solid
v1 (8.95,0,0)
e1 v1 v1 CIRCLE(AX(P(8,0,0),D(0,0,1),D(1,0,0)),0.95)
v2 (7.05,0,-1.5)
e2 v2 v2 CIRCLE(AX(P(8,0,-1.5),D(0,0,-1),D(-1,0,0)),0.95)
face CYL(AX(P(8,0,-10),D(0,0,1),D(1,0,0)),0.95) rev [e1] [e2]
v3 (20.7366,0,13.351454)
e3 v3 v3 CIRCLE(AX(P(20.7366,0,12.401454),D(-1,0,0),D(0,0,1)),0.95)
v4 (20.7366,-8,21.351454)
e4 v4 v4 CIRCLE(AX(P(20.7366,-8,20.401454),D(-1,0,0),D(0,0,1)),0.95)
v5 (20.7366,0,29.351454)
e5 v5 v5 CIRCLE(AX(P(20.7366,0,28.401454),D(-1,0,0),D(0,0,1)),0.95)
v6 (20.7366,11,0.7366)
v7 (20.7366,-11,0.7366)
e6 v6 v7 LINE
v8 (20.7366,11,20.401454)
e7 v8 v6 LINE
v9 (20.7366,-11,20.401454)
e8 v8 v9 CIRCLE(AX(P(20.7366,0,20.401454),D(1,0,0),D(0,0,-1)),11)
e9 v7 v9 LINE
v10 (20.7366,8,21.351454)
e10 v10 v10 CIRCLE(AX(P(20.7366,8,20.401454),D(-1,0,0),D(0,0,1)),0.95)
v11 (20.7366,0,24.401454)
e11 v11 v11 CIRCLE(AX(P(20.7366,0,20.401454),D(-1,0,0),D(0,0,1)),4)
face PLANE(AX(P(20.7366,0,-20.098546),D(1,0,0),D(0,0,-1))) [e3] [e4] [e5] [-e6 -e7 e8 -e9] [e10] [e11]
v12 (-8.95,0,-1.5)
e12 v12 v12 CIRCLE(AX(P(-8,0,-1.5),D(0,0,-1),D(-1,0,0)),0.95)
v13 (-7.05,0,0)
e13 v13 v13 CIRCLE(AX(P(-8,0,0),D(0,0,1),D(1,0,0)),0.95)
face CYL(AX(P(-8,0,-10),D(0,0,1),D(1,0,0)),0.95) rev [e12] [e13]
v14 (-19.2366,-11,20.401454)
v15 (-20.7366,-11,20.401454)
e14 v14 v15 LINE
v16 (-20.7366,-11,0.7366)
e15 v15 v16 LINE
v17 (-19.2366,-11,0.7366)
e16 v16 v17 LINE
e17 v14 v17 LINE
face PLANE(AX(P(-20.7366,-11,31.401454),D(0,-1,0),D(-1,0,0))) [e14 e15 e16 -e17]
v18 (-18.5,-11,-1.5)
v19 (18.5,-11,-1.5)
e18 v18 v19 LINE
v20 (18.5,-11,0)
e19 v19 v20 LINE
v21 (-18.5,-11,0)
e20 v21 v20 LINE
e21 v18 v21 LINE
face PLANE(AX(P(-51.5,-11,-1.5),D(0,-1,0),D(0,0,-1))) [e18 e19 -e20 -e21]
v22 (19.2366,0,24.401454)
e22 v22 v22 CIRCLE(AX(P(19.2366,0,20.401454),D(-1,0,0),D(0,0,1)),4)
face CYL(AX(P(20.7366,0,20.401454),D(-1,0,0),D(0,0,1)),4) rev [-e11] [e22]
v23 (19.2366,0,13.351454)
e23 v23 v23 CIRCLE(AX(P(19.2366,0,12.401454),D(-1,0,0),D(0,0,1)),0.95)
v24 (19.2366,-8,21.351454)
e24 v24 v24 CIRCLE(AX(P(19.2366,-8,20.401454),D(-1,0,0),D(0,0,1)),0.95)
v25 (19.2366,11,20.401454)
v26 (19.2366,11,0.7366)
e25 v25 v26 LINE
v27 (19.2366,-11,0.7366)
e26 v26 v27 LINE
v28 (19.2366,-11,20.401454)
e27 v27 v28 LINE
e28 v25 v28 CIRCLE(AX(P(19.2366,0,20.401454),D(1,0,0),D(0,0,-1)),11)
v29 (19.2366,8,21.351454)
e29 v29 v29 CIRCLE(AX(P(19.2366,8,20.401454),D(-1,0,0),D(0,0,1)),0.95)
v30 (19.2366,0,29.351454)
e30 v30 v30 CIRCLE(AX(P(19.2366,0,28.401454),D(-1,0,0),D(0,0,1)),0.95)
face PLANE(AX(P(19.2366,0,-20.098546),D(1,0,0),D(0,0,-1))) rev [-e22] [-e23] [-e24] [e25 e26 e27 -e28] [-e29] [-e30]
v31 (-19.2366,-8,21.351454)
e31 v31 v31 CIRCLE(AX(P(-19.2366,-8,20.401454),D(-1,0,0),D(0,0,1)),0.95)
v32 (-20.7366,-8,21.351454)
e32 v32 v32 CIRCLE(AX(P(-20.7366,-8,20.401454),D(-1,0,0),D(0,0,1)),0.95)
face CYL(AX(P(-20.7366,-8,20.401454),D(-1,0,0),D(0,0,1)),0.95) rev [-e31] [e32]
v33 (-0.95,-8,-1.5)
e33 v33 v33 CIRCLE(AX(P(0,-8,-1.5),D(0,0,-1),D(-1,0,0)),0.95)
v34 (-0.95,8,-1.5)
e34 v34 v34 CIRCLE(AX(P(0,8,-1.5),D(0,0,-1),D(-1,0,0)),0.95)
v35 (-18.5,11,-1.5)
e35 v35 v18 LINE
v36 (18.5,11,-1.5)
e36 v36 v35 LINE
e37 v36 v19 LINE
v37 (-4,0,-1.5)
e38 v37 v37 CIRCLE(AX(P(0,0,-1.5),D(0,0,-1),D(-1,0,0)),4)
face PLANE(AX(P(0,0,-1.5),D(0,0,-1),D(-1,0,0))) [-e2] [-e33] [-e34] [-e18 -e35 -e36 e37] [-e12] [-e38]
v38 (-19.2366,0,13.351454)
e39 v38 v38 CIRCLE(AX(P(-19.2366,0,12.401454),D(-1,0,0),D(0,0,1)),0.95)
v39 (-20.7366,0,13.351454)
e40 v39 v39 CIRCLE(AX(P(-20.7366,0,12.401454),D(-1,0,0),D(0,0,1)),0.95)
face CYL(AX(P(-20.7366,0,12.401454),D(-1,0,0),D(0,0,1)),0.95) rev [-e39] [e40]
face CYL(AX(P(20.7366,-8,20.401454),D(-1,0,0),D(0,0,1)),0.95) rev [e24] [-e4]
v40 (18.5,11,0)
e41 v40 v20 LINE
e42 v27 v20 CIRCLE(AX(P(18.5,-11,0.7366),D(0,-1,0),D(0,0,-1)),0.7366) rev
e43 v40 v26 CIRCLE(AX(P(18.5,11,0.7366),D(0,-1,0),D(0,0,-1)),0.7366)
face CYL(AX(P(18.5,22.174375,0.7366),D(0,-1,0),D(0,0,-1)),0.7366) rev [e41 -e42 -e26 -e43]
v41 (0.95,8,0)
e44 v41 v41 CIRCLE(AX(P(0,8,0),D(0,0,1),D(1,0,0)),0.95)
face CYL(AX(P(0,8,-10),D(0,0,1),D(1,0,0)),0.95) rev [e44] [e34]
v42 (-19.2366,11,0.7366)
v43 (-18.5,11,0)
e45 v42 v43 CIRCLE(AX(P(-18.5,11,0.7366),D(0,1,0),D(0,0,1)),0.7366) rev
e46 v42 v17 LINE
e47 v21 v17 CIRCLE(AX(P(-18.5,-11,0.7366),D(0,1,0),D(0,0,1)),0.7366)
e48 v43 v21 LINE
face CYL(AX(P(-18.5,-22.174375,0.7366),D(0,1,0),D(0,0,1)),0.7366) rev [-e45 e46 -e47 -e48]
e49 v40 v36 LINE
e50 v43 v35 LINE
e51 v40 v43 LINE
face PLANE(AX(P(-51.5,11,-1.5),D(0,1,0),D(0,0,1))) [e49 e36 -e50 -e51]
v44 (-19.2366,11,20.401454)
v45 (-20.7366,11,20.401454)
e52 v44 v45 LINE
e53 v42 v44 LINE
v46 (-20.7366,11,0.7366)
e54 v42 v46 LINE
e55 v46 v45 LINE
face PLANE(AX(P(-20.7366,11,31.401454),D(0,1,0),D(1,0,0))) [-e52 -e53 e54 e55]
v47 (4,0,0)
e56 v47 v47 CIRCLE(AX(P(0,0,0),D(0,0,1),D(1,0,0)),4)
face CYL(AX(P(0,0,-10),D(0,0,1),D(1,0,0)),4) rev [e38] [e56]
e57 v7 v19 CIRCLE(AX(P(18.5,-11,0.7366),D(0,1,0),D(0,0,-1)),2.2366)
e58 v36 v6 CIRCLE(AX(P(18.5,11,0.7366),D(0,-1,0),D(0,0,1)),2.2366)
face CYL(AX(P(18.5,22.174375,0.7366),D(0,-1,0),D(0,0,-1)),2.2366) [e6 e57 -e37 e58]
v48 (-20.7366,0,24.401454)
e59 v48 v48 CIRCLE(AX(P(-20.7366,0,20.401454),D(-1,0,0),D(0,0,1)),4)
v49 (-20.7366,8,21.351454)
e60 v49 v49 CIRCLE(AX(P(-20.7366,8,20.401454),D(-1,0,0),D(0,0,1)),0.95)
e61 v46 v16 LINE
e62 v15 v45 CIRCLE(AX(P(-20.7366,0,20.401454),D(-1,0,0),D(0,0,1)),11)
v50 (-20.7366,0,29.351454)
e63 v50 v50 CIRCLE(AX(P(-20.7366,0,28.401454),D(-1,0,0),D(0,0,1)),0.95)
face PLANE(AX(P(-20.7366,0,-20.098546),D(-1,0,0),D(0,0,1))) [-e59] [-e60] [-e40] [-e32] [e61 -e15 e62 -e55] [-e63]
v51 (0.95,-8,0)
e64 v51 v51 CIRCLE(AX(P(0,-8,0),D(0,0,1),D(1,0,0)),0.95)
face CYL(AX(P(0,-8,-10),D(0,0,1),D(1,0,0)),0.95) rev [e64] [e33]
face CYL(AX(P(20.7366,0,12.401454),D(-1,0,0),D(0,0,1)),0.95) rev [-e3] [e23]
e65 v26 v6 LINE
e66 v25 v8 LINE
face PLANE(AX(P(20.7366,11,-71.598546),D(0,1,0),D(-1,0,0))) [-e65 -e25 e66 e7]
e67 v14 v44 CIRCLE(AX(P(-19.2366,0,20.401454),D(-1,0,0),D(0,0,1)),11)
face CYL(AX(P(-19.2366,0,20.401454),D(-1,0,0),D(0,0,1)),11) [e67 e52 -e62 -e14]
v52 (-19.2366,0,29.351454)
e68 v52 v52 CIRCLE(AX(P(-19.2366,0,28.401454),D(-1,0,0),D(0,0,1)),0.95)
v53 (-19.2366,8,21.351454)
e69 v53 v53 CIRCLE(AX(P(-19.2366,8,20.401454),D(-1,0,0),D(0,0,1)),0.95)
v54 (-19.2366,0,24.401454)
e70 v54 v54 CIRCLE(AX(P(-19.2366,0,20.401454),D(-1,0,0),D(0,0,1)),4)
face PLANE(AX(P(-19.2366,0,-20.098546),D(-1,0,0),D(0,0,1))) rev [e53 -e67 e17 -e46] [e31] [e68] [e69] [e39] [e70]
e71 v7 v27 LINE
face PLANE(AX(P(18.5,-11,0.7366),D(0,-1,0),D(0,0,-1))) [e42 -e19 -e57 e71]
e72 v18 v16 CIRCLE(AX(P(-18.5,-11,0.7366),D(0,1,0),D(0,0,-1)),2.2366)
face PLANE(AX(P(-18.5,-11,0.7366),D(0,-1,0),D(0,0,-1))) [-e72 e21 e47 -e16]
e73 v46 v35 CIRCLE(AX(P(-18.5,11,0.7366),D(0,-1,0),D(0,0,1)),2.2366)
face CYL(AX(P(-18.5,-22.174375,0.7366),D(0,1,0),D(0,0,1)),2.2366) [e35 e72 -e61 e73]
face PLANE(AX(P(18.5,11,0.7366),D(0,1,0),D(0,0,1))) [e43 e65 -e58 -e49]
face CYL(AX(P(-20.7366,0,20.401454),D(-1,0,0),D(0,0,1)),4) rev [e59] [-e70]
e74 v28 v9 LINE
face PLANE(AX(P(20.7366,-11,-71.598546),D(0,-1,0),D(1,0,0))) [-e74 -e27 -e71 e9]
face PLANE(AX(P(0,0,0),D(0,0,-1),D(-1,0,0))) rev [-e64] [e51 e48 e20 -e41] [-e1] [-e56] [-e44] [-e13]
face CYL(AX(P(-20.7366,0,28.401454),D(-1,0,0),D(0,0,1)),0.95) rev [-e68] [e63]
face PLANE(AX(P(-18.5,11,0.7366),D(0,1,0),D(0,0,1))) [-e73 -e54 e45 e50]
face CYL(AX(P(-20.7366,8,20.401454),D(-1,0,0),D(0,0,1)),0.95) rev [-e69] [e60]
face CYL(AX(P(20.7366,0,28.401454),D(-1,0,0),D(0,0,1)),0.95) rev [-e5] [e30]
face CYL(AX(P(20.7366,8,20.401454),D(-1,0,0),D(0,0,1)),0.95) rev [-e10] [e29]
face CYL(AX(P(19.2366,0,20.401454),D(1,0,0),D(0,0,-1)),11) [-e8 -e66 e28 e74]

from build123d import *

# Parameters (mm, degrees)
SKETCH_1_W             = 103
SKETCH_1_H             = 22
SM_BASE_FLANGE_1_DEPTH = 1.5
OTHER_START            = -11
OTHER_1_DEPTH          = 22
OTHER_1_2_DEPTH        = 22
SKETCH_7_R             = 0.95
SKETCH_7_R_2           = 4
CUT_EXTRUDE_1_DEPTH    = 54.170270292
SKETCH_8_R             = 4
SKETCH_8_R_2           = 0.95
CUT_EXTRUDE_2_DEPTH    = 10


# Read off the part's stored shape, not the designer's step: 绘制的折弯1
# Sheet-metal steps are written as plain solids
with BuildPart() as part:
    # Sketch 1 → 基体-法兰1 (new body)
    with BuildSketch(Plane.XY):
        Rectangle(SKETCH_1_W, SKETCH_1_H)
    extrude(amount=-SM_BASE_FLANGE_1_DEPTH)

    # Other 1 outline → Other 1 (cut)
    with BuildSketch(Plane(origin=(0, 0, 0), x_dir=(1, 0, 0), z_dir=(0, 1, 0)).offset(OTHER_START)):
        with BuildLine():
            ThreePointArc((-20.611823856, 0), (-19.795164082, 1.086838938), (-18.5, 1.5))
            Line((-18.5, 1.5), (-51.5, 1.5))
            Line((-51.5, 1.5), (-51.5, 0))
            Line((-51.5, 0), (-20.611823856, 0))
        make_face()
        with BuildLine():
            Line((51.5, 1.5), (18.5, 1.5))
            ThreePointArc((18.5, 1.5), (19.795164082, 1.086838938), (20.611823856, 0))
            Line((20.611823856, 0), (51.5, 0))
            Line((51.5, 0), (51.5, 1.5))
        make_face()
    extrude(amount=OTHER_1_DEPTH, mode=Mode.SUBTRACT)

    # Other 1 2 outline → Other 1 2 (add)
    with BuildSketch(Plane(origin=(0, 0, 0), x_dir=(1, 0, 0), z_dir=(0, 1, 0)).offset(OTHER_START)):
        with BuildLine():
            Line((-18.5, 0), (-20.611823856, 0))
            ThreePointArc((-20.611823856, 0), (-20.705185343, -0.363053267), (-20.7366, -0.7366))
            Line((-20.7366, -0.7366), (-20.7366, -31.401454181))
            Line((-20.7366, -31.401454181), (-19.2366, -31.401454181))
            Line((-19.2366, -31.401454181), (-19.2366, -0.7366))
            ThreePointArc((-19.2366, -0.7366), (-19.020854855, -0.215745145), (-18.5, 0))
        make_face()
        with BuildLine():
            ThreePointArc((20.7366, -0.7366), (20.705185343, -0.363053267), (20.611823856, 0))
            Line((20.611823856, 0), (18.5, 0))
            ThreePointArc((18.5, 0), (19.020854855, -0.215745145), (19.2366, -0.7366))
            Line((19.2366, -0.7366), (19.2366, -31.401454181))
            Line((19.2366, -31.401454181), (20.7366, -31.401454181))
            Line((20.7366, -31.401454181), (20.7366, -0.7366))
        make_face()
    extrude(amount=OTHER_1_2_DEPTH)

    # 草图7 → 切除-拉伸1 (cut, through all)
    with BuildSketch(Plane.ZY.offset(20.7366)):
        with Locations((20.401454181, 8)):
            Circle(SKETCH_7_R)
        with Locations((12.401454181, 0)):
            Circle(SKETCH_7_R)
        with Locations((20.401454181, 0)):
            Circle(SKETCH_7_R_2)
        with Locations((28.401454181, 0)):
            Circle(SKETCH_7_R)
        with Locations((20.401454181, -8)):
            Circle(SKETCH_7_R)
        with BuildLine():
            ThreePointArc((20.401454181, 11), (28.179628774, 7.778174593), (31.401454181, 0))
            Line((31.401454181, 0), (31.401454181, 11))
            Line((31.401454181, 11), (20.401454181, 11))
        make_face()
        with BuildLine():
            Line((31.401454181, -11), (31.401454181, 0))
            ThreePointArc((31.401454181, 0), (28.179628774, -7.778174593), (20.401454181, -11))
            Line((20.401454181, -11), (31.401454181, -11))
        make_face()
    extrude(amount=-CUT_EXTRUDE_1_DEPTH, mode=Mode.SUBTRACT)

    # 草图8 → 切除-拉伸2 (cut)
    with BuildSketch(Plane.XY):
        Circle(SKETCH_8_R)
        with Locations((0, 8)):
            Circle(SKETCH_8_R_2)
        with Locations((8, 0)):
            Circle(SKETCH_8_R_2)
        with Locations((0, -8)):
            Circle(SKETCH_8_R_2)
        with Locations((-8, 0)):
            Circle(SKETCH_8_R_2)
    extrude(amount=-CUT_EXTRUDE_2_DEPTH, mode=Mode.SUBTRACT)


solid = part.part
